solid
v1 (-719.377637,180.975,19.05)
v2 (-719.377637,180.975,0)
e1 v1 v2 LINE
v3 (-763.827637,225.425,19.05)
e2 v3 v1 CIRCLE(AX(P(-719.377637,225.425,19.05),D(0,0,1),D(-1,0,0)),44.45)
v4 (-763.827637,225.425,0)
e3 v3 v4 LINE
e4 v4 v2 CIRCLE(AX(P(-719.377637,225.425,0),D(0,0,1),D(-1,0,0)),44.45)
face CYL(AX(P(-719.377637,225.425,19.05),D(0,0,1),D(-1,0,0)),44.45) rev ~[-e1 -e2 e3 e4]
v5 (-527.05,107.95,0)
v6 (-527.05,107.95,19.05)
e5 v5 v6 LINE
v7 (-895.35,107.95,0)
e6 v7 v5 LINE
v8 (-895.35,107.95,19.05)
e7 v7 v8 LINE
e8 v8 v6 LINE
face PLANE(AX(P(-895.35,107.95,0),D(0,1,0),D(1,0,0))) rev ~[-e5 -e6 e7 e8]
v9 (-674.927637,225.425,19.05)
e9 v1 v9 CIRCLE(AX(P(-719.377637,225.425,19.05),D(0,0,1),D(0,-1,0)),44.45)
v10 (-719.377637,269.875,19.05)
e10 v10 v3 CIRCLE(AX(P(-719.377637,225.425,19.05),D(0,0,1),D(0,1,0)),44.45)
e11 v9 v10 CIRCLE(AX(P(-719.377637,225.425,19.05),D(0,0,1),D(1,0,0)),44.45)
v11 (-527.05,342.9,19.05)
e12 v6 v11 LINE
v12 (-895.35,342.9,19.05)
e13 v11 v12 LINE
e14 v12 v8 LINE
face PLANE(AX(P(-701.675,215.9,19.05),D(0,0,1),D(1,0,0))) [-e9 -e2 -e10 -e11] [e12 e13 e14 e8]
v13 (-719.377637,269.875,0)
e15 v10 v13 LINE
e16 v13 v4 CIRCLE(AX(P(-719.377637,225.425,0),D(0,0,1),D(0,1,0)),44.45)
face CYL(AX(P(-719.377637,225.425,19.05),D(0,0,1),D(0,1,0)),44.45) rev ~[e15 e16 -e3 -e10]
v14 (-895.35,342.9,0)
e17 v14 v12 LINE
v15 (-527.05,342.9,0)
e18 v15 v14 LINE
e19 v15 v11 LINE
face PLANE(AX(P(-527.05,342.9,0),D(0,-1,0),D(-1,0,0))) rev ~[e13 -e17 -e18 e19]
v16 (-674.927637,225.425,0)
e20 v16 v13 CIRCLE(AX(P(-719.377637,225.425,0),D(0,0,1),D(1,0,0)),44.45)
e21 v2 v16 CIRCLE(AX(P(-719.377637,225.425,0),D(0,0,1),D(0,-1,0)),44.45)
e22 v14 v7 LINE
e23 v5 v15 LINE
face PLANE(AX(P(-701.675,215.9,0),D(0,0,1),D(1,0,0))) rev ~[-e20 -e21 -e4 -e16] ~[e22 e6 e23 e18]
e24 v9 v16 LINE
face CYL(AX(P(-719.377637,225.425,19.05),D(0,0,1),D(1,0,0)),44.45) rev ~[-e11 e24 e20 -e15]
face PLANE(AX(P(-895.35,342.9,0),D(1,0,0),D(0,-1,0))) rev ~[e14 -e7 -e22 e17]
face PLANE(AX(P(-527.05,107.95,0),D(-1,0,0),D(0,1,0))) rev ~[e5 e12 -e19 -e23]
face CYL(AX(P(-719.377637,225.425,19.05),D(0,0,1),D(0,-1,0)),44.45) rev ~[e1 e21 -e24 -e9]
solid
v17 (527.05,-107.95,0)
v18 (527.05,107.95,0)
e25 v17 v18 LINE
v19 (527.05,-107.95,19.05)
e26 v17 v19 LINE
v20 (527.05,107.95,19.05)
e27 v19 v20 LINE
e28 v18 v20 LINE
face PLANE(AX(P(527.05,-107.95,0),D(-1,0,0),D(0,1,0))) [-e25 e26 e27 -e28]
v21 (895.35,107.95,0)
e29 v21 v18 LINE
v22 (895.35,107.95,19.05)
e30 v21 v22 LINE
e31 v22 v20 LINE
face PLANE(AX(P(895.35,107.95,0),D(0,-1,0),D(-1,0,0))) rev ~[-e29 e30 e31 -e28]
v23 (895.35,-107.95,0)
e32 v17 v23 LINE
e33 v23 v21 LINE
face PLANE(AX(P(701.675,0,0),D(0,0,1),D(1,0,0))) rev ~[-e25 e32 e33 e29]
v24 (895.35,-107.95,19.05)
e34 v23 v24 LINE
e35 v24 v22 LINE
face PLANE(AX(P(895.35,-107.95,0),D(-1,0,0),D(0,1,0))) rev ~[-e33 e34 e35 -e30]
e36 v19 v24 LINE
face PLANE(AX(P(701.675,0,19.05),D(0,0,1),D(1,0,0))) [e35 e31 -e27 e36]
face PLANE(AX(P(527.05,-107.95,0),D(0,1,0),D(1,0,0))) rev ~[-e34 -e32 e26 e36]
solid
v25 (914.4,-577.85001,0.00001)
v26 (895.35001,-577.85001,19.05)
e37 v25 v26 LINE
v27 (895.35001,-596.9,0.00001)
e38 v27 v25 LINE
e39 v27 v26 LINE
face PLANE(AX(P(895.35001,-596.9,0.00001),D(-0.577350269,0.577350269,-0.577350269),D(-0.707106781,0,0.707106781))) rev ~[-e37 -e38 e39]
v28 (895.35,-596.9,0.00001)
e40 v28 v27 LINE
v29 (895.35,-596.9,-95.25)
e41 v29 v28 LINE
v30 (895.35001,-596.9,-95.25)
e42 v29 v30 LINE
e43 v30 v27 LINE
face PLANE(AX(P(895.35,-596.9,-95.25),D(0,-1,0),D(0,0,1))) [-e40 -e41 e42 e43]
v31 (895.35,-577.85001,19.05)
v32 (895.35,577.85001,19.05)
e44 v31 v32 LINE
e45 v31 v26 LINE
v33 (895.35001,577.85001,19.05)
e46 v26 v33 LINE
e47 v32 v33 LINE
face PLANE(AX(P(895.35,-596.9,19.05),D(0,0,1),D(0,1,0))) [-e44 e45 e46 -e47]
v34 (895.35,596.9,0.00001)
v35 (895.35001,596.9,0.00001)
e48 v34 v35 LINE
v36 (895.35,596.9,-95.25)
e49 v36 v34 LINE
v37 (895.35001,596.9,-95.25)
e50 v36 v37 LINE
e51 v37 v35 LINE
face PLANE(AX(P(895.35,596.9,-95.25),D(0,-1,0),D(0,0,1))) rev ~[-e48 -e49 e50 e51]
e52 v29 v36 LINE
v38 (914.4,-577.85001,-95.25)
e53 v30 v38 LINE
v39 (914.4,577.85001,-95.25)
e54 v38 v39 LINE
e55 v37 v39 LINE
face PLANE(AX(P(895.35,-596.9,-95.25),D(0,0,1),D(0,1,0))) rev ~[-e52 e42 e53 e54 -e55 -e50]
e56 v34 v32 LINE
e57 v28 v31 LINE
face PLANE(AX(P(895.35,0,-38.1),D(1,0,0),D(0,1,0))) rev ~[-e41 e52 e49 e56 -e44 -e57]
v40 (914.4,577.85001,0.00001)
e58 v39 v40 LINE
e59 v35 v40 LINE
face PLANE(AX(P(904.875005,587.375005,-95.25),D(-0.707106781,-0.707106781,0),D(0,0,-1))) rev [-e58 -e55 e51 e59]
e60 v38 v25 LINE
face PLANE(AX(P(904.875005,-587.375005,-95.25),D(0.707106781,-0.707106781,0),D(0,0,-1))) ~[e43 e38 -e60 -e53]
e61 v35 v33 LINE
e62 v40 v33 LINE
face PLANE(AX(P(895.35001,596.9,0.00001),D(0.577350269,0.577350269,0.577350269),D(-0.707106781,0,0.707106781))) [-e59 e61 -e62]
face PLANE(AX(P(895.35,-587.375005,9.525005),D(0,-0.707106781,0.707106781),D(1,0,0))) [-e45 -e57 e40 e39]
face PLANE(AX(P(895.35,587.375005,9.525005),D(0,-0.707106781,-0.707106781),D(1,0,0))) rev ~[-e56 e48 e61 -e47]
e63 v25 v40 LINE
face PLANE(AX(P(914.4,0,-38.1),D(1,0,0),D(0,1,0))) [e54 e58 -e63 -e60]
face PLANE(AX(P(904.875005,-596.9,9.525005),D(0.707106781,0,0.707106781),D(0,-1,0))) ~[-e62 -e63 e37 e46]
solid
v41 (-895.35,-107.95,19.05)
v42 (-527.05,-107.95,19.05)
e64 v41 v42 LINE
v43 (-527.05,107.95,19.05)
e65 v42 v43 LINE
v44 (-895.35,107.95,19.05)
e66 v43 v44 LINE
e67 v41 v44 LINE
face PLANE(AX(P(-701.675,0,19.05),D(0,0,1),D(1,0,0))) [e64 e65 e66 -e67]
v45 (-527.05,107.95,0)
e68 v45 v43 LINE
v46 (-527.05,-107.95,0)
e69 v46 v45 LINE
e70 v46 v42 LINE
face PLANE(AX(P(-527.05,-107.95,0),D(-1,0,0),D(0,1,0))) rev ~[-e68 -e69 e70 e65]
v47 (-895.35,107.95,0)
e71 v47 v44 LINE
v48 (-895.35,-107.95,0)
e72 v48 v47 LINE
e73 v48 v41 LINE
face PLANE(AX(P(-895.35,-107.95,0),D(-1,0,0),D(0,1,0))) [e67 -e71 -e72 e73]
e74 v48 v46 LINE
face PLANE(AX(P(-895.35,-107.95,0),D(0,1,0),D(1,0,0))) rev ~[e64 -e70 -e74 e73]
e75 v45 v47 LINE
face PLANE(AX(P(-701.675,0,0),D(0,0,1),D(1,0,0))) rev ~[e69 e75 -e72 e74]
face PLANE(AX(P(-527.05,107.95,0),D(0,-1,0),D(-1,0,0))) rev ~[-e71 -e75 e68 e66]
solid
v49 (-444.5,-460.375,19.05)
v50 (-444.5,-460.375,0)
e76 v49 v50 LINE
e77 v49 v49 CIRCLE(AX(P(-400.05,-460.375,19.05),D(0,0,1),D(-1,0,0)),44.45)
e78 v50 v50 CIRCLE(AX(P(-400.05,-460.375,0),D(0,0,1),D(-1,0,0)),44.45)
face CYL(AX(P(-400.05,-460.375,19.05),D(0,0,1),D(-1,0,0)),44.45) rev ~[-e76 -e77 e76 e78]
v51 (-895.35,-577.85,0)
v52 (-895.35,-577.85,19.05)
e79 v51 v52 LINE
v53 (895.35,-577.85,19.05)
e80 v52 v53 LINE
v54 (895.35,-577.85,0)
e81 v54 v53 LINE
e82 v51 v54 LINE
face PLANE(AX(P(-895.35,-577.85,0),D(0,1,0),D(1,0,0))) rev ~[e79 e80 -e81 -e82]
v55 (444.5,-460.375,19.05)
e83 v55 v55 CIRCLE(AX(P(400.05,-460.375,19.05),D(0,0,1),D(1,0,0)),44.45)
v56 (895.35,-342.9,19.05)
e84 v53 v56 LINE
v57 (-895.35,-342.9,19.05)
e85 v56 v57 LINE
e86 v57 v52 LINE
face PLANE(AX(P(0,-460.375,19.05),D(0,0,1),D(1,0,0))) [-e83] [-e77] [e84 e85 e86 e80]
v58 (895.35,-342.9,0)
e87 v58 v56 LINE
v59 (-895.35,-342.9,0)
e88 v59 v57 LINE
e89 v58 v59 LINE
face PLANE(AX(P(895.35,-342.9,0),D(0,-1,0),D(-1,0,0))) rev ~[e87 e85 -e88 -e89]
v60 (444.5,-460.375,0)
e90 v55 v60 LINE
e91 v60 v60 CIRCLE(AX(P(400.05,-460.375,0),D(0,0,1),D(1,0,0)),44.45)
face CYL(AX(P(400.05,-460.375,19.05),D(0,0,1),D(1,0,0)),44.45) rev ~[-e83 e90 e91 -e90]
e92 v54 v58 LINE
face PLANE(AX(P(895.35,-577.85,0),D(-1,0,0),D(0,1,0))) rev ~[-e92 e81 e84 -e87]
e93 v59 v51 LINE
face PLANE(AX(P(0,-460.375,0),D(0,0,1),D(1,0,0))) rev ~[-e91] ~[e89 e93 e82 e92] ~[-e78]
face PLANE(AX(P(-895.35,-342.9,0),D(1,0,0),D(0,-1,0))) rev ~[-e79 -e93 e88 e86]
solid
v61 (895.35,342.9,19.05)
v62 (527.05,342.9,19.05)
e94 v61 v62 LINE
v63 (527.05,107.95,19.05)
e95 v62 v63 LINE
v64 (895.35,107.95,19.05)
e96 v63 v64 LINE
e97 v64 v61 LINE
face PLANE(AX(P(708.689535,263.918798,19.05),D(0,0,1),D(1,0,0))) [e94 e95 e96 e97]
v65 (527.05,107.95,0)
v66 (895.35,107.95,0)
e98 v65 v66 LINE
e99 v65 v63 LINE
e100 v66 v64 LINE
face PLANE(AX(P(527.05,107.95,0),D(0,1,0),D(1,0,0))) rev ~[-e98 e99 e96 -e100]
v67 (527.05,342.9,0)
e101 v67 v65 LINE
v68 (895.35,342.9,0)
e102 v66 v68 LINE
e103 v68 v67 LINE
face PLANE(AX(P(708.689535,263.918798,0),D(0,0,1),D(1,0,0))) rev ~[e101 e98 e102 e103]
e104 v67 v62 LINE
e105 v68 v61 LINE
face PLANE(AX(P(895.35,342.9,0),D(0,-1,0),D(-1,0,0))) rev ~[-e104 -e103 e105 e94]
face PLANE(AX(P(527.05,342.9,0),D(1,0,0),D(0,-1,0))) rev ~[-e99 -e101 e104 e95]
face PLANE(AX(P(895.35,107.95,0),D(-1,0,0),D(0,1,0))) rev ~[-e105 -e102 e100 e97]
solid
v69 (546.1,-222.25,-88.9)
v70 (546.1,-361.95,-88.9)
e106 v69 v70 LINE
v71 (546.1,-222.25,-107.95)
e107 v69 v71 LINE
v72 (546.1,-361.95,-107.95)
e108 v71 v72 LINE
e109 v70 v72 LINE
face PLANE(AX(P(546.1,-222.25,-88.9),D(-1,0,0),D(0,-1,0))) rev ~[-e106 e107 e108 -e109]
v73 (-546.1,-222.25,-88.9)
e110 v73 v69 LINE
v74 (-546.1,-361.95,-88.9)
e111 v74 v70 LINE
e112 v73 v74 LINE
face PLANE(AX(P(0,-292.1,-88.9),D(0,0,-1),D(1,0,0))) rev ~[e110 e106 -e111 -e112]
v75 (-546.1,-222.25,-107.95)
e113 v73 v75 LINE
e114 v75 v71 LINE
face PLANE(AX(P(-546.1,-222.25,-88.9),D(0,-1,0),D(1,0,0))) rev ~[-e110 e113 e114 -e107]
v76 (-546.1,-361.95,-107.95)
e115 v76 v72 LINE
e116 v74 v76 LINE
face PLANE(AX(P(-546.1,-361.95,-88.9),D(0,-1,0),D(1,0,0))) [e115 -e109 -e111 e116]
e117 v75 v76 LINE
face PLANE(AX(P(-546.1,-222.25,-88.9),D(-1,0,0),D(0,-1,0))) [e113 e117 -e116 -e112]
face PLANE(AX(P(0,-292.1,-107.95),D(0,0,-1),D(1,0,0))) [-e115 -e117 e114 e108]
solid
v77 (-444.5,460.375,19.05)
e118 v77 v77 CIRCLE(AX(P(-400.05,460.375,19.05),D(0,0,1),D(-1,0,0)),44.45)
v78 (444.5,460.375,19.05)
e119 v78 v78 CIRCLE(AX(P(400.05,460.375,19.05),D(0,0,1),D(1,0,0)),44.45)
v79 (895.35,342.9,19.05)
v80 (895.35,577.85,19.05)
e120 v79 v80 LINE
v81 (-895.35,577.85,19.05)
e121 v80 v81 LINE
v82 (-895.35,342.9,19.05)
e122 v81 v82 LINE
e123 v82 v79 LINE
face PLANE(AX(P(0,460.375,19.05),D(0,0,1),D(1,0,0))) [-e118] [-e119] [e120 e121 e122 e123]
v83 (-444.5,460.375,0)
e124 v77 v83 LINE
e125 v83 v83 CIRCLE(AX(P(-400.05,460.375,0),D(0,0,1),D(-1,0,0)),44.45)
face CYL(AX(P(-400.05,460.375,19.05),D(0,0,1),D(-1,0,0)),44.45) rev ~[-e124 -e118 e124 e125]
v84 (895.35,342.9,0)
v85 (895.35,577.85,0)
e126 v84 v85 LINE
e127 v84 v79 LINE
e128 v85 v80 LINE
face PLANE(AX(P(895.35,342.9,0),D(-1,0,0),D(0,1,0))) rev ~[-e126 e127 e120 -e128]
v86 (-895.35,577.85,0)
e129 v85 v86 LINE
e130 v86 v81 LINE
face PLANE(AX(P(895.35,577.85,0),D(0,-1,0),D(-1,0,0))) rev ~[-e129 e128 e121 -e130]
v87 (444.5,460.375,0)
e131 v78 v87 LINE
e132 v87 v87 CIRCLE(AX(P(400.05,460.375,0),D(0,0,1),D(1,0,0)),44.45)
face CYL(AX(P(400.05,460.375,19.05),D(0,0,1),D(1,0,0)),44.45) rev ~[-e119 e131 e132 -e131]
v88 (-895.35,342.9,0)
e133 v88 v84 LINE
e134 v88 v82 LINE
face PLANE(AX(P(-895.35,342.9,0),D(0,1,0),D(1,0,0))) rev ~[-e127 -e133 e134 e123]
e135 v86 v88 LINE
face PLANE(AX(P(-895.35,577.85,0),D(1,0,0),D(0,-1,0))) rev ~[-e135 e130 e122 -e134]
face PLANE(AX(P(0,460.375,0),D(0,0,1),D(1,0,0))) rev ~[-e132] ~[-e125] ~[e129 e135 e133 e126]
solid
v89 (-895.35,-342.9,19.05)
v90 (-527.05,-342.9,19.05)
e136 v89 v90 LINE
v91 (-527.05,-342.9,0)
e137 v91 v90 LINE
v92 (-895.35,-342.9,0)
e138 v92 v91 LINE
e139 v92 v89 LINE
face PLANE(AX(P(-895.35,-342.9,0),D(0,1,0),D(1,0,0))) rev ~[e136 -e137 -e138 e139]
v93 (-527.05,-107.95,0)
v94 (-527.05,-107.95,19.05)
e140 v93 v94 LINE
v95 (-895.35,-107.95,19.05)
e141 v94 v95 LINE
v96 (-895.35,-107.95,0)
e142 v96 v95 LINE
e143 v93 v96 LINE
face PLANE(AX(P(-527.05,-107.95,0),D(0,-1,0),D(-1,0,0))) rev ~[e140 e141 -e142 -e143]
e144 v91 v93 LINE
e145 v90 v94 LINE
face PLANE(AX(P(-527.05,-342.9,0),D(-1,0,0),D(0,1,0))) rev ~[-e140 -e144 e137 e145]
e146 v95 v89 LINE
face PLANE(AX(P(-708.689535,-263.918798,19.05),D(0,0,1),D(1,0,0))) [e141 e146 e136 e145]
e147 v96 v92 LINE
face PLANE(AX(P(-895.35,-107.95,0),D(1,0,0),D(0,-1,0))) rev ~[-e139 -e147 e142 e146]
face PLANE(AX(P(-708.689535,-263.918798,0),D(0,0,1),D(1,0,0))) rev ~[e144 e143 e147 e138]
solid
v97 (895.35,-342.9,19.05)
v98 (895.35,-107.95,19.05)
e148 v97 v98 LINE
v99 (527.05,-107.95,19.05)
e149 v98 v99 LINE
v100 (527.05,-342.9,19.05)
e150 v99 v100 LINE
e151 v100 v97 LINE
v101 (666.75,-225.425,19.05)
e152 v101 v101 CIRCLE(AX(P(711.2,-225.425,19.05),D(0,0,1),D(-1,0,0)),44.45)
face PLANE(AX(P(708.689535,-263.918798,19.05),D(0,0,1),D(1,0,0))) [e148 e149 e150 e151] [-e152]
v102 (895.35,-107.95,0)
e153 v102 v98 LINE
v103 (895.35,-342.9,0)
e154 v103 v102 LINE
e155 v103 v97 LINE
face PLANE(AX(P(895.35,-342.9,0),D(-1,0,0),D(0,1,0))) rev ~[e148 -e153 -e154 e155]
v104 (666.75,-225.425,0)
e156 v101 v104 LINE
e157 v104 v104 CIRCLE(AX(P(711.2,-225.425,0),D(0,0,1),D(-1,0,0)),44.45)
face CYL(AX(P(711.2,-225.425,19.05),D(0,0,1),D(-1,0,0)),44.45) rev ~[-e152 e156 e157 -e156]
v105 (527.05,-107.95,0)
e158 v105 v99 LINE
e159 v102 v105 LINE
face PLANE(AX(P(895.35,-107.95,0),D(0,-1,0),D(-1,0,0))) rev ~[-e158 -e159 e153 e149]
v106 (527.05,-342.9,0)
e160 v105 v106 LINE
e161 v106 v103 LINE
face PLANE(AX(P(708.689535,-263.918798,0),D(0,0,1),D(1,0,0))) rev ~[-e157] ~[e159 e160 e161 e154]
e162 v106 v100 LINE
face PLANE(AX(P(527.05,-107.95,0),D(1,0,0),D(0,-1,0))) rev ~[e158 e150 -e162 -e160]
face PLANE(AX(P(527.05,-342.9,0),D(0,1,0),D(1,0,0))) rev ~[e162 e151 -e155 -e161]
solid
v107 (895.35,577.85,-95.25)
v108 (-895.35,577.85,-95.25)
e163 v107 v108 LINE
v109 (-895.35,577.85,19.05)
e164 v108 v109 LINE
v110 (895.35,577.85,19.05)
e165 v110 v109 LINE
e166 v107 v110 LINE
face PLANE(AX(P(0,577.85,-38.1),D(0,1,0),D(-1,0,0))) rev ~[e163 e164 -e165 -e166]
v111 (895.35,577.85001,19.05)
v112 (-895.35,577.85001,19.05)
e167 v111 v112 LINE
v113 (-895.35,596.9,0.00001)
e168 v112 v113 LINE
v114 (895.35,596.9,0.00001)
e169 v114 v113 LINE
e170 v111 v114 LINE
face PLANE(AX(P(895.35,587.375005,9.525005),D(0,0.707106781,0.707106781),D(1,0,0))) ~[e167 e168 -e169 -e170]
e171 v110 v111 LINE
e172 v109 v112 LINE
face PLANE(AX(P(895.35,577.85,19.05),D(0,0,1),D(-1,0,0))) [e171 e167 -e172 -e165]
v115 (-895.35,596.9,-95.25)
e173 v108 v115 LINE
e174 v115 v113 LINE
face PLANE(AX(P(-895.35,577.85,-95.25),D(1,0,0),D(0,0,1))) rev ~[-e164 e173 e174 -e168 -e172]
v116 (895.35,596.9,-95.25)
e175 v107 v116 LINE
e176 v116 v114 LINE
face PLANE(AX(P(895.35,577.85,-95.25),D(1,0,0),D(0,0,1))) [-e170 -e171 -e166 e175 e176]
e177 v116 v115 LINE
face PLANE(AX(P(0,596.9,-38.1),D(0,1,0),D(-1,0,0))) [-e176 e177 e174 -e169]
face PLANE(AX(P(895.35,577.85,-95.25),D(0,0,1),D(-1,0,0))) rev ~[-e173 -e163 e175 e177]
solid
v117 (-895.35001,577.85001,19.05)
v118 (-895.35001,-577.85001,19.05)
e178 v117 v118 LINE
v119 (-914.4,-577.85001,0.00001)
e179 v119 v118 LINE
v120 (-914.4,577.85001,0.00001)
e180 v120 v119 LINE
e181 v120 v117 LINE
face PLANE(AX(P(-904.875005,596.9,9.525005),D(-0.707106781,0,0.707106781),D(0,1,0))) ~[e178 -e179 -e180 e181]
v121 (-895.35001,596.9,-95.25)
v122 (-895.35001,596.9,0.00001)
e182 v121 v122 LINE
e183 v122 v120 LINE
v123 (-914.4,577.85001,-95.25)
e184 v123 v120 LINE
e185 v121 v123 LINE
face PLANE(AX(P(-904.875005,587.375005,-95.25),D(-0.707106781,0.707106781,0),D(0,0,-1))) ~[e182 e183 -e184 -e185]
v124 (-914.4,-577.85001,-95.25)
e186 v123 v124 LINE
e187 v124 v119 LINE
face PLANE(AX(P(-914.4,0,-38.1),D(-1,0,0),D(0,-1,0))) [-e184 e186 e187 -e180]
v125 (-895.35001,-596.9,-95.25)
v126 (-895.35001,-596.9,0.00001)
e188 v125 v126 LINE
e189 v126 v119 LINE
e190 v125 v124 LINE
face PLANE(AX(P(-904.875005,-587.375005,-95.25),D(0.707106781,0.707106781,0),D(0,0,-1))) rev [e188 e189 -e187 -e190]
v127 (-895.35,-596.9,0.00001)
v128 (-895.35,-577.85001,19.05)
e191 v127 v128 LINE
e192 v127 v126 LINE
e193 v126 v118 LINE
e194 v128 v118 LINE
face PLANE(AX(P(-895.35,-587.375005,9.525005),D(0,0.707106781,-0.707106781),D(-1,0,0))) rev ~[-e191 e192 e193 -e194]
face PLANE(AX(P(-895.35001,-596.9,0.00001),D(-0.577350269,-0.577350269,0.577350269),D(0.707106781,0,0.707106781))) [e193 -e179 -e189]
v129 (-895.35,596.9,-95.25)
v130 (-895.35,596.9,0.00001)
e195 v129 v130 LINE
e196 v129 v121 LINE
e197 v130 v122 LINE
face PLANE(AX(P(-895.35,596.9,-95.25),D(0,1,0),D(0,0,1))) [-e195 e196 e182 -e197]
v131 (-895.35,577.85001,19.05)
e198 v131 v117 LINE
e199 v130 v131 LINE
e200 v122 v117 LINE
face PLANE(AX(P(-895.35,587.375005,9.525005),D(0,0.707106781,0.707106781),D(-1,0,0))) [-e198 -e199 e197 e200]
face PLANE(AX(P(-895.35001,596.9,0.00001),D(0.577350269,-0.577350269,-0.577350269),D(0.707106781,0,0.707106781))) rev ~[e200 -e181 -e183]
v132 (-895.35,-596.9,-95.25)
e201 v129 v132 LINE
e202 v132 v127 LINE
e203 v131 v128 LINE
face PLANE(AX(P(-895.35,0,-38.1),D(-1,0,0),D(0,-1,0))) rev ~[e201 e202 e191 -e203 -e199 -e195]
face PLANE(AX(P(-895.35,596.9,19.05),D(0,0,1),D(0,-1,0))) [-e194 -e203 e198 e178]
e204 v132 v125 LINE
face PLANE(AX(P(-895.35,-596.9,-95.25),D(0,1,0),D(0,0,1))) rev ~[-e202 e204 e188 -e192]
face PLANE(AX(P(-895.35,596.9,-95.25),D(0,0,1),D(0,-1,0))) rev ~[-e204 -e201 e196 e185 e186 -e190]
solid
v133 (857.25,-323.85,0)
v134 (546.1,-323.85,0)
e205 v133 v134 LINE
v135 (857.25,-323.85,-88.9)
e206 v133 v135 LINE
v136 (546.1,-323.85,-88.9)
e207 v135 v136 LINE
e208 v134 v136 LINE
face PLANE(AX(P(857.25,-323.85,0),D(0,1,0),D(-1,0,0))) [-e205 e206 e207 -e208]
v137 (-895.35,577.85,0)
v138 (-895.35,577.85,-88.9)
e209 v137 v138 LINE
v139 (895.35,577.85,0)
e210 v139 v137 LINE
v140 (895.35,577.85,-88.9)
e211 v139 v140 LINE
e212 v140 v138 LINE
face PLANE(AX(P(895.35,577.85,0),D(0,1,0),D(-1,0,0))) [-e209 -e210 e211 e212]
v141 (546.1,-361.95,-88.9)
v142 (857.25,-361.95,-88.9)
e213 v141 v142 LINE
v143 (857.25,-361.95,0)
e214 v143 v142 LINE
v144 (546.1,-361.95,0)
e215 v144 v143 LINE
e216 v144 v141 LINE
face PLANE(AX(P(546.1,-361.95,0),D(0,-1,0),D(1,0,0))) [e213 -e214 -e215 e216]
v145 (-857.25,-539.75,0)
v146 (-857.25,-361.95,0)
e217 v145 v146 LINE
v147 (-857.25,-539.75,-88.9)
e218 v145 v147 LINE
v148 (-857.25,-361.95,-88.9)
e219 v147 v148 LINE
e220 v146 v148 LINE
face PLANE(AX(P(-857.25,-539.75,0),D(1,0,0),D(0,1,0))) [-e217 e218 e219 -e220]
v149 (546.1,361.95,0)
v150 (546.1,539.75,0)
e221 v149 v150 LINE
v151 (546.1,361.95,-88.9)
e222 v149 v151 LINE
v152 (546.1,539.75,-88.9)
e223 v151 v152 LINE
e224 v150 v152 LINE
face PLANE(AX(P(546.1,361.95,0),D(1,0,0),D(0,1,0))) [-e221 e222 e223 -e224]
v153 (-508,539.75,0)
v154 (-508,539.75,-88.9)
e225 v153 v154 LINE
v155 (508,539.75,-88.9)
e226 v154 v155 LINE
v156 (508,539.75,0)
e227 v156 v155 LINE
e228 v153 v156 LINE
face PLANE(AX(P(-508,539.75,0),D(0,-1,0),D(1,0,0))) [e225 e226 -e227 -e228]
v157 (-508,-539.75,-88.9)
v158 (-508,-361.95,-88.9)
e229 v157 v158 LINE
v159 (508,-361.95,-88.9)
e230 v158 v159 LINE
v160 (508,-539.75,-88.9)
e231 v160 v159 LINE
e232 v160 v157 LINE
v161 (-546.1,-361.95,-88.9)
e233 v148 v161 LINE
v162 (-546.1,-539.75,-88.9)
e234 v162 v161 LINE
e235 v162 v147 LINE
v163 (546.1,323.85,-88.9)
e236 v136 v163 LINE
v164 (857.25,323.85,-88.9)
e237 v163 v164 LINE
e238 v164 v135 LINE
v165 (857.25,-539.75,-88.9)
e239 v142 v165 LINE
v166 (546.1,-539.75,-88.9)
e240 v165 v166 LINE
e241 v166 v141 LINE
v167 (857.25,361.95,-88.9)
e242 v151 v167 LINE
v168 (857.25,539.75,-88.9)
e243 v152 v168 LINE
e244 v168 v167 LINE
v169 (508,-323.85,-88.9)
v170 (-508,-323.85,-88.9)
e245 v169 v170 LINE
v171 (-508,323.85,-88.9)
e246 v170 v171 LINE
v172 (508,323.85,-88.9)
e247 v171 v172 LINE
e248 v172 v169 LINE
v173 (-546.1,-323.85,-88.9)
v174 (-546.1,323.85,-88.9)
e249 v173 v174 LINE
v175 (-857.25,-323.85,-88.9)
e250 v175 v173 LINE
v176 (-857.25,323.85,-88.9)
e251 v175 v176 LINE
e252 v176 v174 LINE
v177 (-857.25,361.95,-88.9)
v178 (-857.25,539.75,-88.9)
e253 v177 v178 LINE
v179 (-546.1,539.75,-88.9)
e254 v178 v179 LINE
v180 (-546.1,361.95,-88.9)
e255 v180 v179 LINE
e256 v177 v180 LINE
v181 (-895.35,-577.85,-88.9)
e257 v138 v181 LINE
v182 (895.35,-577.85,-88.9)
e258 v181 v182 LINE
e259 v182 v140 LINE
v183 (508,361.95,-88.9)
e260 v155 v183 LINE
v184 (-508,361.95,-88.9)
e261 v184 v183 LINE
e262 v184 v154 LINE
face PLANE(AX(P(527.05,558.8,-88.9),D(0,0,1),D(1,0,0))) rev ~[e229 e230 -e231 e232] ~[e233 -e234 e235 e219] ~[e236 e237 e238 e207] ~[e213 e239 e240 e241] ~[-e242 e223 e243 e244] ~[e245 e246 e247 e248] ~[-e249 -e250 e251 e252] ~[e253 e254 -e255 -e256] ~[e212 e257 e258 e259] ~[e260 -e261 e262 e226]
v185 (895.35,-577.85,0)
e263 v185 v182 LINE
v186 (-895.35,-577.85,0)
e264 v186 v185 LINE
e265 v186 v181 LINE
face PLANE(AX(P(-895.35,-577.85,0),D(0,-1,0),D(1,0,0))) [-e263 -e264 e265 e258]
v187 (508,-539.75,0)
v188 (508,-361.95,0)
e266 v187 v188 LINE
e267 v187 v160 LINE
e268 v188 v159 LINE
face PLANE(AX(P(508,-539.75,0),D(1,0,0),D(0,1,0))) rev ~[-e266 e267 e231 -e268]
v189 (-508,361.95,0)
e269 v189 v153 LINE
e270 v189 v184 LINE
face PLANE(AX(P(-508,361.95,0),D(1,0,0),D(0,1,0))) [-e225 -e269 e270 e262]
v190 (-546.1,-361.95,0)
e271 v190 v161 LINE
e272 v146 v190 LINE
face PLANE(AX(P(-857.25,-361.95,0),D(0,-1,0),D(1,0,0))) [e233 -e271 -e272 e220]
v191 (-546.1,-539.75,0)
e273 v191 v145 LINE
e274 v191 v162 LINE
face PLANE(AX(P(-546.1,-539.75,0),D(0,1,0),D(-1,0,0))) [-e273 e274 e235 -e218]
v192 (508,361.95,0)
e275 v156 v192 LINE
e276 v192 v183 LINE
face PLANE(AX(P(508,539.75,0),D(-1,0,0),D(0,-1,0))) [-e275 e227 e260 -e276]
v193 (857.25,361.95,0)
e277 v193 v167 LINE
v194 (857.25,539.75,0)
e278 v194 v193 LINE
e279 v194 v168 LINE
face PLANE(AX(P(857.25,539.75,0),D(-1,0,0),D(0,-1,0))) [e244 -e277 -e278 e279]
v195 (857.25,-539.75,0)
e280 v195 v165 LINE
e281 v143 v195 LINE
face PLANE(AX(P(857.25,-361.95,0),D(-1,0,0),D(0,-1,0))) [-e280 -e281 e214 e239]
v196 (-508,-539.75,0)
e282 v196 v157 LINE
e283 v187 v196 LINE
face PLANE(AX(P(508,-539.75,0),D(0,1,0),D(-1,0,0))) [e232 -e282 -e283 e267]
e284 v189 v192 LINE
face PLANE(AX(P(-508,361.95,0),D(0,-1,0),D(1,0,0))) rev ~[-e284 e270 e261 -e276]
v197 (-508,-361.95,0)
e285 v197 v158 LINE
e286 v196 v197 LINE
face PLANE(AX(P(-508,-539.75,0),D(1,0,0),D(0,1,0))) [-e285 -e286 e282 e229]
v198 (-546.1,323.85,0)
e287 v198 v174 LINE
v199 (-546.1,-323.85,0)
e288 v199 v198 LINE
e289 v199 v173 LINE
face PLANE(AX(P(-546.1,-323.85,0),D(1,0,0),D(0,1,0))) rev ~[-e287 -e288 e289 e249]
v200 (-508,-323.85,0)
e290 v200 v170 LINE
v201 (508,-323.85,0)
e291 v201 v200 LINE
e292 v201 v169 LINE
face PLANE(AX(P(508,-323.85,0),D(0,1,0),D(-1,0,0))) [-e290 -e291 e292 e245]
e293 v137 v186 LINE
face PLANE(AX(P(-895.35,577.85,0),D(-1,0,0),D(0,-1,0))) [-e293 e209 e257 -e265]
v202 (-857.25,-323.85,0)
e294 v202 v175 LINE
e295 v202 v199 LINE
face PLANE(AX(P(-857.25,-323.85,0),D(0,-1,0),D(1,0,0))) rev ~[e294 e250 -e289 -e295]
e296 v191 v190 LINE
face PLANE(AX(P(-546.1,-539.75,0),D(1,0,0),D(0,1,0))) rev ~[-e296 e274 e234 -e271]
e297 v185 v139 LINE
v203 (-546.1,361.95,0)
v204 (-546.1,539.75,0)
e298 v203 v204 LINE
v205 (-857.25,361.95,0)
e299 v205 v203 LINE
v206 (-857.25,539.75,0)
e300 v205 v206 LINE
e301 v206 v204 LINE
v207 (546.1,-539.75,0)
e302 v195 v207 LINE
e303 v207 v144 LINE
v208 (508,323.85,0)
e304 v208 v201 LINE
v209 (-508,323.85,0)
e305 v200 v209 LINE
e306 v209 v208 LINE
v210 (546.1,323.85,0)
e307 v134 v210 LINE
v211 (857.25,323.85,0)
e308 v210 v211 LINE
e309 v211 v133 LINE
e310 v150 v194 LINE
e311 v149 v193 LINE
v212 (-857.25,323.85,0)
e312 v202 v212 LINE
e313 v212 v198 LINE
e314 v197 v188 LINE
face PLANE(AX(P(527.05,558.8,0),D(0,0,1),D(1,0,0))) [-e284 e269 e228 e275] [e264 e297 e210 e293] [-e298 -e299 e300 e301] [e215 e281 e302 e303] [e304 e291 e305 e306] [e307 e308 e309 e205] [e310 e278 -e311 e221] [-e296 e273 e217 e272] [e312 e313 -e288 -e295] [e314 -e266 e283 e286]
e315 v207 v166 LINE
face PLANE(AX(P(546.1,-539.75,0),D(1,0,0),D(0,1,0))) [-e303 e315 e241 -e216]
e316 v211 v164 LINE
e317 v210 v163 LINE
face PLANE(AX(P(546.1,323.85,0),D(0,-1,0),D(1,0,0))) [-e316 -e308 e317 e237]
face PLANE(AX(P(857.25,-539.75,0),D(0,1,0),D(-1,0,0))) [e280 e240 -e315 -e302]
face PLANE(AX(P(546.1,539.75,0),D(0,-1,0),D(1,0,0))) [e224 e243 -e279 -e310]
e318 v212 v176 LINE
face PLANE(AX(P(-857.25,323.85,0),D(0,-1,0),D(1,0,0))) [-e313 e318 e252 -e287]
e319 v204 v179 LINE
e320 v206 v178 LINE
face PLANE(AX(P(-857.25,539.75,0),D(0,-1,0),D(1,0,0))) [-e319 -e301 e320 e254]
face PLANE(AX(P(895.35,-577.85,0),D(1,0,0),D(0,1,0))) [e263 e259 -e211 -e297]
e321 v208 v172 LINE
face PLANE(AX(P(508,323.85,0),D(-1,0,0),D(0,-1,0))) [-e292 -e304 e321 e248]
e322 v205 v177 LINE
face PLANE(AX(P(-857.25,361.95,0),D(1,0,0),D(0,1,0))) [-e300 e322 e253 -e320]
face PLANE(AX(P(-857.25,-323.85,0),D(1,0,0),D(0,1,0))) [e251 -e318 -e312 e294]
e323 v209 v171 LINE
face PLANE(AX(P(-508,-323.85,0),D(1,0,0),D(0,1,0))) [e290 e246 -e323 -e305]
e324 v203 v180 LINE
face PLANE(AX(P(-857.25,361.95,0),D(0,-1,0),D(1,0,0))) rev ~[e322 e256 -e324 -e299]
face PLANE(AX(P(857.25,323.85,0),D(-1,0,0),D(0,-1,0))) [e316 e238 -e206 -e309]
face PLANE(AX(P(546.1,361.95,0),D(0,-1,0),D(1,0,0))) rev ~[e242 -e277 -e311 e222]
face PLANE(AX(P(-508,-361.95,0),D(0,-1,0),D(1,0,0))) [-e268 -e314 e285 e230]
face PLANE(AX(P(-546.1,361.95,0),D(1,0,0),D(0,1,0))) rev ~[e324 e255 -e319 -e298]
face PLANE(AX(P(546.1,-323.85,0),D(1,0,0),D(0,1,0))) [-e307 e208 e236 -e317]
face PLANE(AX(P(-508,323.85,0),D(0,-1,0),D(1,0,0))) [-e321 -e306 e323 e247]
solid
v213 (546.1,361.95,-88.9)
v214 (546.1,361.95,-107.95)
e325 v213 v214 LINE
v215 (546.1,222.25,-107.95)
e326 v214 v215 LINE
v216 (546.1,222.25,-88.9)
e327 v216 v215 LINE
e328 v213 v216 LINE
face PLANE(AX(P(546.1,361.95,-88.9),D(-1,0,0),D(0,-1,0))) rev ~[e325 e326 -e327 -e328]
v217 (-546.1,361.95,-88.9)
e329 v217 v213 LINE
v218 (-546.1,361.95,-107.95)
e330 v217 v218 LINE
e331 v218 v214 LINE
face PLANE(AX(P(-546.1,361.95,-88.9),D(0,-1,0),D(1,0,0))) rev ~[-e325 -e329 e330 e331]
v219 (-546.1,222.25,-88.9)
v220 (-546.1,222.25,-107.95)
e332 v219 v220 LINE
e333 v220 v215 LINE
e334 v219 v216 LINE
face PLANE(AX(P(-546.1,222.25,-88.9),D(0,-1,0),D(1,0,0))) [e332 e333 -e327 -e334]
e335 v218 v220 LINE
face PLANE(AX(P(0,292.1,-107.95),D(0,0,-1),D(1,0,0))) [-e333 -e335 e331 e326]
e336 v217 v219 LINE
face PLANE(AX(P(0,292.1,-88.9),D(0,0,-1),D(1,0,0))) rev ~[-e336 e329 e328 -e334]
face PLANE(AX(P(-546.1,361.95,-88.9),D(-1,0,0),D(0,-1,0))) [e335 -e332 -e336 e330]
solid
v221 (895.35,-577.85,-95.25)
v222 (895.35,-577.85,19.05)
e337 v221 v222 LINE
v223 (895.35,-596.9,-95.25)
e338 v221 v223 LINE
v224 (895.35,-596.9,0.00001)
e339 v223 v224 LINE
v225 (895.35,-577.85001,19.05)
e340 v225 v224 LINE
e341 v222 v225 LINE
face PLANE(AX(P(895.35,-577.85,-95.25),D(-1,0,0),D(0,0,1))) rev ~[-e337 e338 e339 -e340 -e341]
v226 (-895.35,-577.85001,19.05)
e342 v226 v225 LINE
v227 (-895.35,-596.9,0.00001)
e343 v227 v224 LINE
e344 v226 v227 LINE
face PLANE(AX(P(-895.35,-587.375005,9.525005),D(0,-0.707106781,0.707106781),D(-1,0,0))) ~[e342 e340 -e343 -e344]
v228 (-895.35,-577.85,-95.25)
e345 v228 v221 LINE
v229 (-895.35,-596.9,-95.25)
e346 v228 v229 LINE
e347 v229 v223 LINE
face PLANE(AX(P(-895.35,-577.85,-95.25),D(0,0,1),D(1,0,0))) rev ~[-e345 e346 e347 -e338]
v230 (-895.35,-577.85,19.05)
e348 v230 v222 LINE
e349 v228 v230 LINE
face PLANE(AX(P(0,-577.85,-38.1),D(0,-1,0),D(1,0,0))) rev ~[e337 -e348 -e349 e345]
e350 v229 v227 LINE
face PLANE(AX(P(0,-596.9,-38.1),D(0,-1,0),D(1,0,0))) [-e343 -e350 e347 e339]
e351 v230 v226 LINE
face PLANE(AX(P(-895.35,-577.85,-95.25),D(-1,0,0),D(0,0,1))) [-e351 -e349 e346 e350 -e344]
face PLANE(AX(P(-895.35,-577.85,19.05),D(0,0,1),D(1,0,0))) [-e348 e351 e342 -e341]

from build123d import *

# Parameters (mm, degrees)
F0_W       = 38.1
F0_H       = 38.1
F0_W_2     = 1016
F0_H_2     = 647.7
F0_W_3     = 311.15
F0_H_3     = 177.8
F1_DEPTH   = 88.9
F2_W       = 311.15
F2_H       = 177.8
F2_W_2     = 1016
F3_DEPTH   = 19.05
F2_H_2     = 215.9
F2_W_3     = 38.1
F2_W_4     = 19.05
F4_DEPTH   = 19.05
F5_W       = 1092.2
F5_H       = 139.7
F6_DEPTH   = 19.05
F7_W       = 1790.7
F7_H       = 114.3
F8_DEPTH   = 19.05
F9_W       = 1790.7
F9_H       = 114.3
F10_DEPTH  = 19.05
F11_W      = 1193.8
F11_H      = 114.3
F12_DEPTH  = 19.05
F13_W      = 1193.8
F13_H      = 114.3
F14_DEPTH  = 19.05
F15_SIZE   = 19.04999
F15_2_SIZE = 19.04999
F15_3_SIZE = 19.04999
F15_4_SIZE = 19.04999
F16_R      = 44.45
F17_DEPTH  = 19.05


# Not quite as in the source:
# - a fillet or chamfer is up to 0.001 mm smaller than in the source, because OpenCascade refuses the exact size


with BuildPart() as f1:
    # F0 (on Top) → F1 (new body)
    with BuildSketch(Plane.XY):
        with Locations((527.05, 558.8)):
            Rectangle(F0_W, F0_H)
        with Locations((0, 558.8)):
            Rectangle(F0_W_2, F0_H)
        with Locations((876.3, 0)):
            Rectangle(F0_W, F0_H_2)
        with Locations((876.3, 342.9)):
            Rectangle(F0_W, F0_H)
        with Locations((-876.3, 342.9)):
            Rectangle(F0_W, F0_H)
        with Locations((-876.3, 0)):
            Rectangle(F0_W, F0_H_2)
        with Locations((-527.05, 558.8)):
            Rectangle(F0_W, F0_H)
        with Locations((0, -558.8)):
            Rectangle(F0_W_2, F0_H)
        with Locations((527.05, -558.8)):
            Rectangle(F0_W, F0_H)
        with Locations((876.3, -342.9)):
            Rectangle(F0_W, F0_H)
        Polygon((546.1, 577.85), (546.1, 539.75), (857.25, 539.75), (857.25, 361.95), (895.35, 361.95), (895.35, 577.85), align=None)
        with Locations((-876.3, -342.9)):
            Rectangle(F0_W, F0_H)
        with Locations((-527.05, -558.8)):
            Rectangle(F0_W, F0_H)
        Polygon((-895.35, 361.95), (-857.25, 361.95), (-857.25, 539.75), (-546.1, 539.75), (-546.1, 577.85), (-895.35, 577.85), align=None)
        Polygon((857.25, -539.75), (546.1, -539.75), (546.1, -577.85), (895.35, -577.85), (895.35, -361.95), (857.25, -361.95), align=None)
        Polygon((-857.25, -539.75), (-857.25, -361.95), (-895.35, -361.95), (-895.35, -577.85), (-546.1, -577.85), (-546.1, -539.75), align=None)
        with Locations((-701.675, 342.9)):
            Rectangle(F0_W_3, F0_H)
        with Locations((-527.05, 450.85)):
            Rectangle(F0_W, F0_H_3)
        with Locations((-527.05, 342.9)):
            Rectangle(F0_W, F0_H)
        with Locations((-527.05, 0)):
            Rectangle(F0_W, F0_H_2)
        with Locations((-701.675, -342.9)):
            Rectangle(F0_W_3, F0_H)
        with Locations((-527.05, -450.85)):
            Rectangle(F0_W, F0_H_3)
        with Locations((-527.05, -342.9)):
            Rectangle(F0_W, F0_H)
        with Locations((0, -342.9)):
            Rectangle(F0_W_2, F0_H)
        with Locations((527.05, -450.85)):
            Rectangle(F0_W, F0_H_3)
        with Locations((527.05, -342.9)):
            Rectangle(F0_W, F0_H)
        with Locations((701.675, -342.9)):
            Rectangle(F0_W_3, F0_H)
        with Locations((527.05, 0)):
            Rectangle(F0_W, F0_H_2)
        with Locations((527.05, 342.9)):
            Rectangle(F0_W, F0_H)
        with Locations((527.05, 450.85)):
            Rectangle(F0_W, F0_H_3)
        with Locations((701.675, 342.9)):
            Rectangle(F0_W_3, F0_H)
        with Locations((0, 342.9)):
            Rectangle(F0_W_2, F0_H)
    extrude(amount=-F1_DEPTH)


with BuildPart() as f3:
    # F2 (on face) → F3 (new body)
    with BuildSketch(Plane.XY):
        Polygon((895.35, 577.85), (-895.35, 577.85), (-895.35, 342.9), (-527.05, 342.9), (527.05, 342.9), (895.35, 342.9), align=None)
        with Locations((-701.675, 450.85)):
            Rectangle(F2_W, F2_H, mode=Mode.SUBTRACT)
        with Locations((0, 450.85)):
            Rectangle(F2_W_2, F2_H, mode=Mode.SUBTRACT)
        with Locations((701.675, 450.85)):
            Rectangle(F2_W, F2_H, mode=Mode.SUBTRACT)
        with Locations((-701.675, 450.85)):
            Rectangle(F2_W, F2_H)
        with Locations((0, 450.85)):
            Rectangle(F2_W_2, F2_H)
        with Locations((701.675, 450.85)):
            Rectangle(F2_W, F2_H)
    extrude(amount=F3_DEPTH)


with BuildPart() as f3b:
    # F2 (on face) → F3, piece 2 (new body)
    with BuildSketch(Plane.XY):
        with Locations((701.675, 0)):
            Rectangle(F2_W, F2_H_2)
        with Locations((876.3, 0)):
            Rectangle(F2_W_3, F2_H_2)
        with Locations((536.575, 0)):
            Rectangle(F2_W_4, F2_H_2)
    extrude(amount=F3_DEPTH)


with BuildPart() as f3c:
    # F2 (on face) → F3, piece 3 (new body)
    with BuildSketch(Plane.XY):
        with Locations((-701.675, 0)):
            Rectangle(F2_W, F2_H_2)
        with Locations((-876.3, 0)):
            Rectangle(F2_W_3, F2_H_2)
        with Locations((-536.575, 0)):
            Rectangle(F2_W_4, F2_H_2)
    extrude(amount=F3_DEPTH)


with BuildPart() as f3d:
    # F2 (on face) → F3, piece 4 (new body)
    with BuildSketch(Plane.XY):
        Polygon((-527.05, -342.9), (-895.35, -342.9), (-895.35, -577.85), (895.35, -577.85), (895.35, -342.9), (527.05, -342.9), align=None)
        with Locations((-701.675, -450.85)):
            Rectangle(F2_W, F2_H, mode=Mode.SUBTRACT)
        with Locations((0, -450.85)):
            Rectangle(F2_W_2, F2_H, mode=Mode.SUBTRACT)
        with Locations((701.675, -450.85)):
            Rectangle(F2_W, F2_H, mode=Mode.SUBTRACT)
        with Locations((-701.675, -450.85)):
            Rectangle(F2_W, F2_H)
        with Locations((0, -450.85)):
            Rectangle(F2_W_2, F2_H)
        with Locations((701.675, -450.85)):
            Rectangle(F2_W, F2_H)
    extrude(amount=F3_DEPTH)


with BuildPart() as f4:
    # F2 (on face) → F4 (new body)
    with BuildSketch(Plane.XY):
        with Locations((-701.675, 215.9)):
            Rectangle(F2_W, F2_H_2)
        Polygon((-527.05, 342.9), (-895.35, 342.9), (-895.35, 107.95), (-857.25, 107.95), (-857.25, 323.85), (-546.1, 323.85), (-546.1, 107.95), (-527.05, 107.95), align=None)
    extrude(amount=F4_DEPTH)


with BuildPart() as f4b:
    # F2 (on face) → F4, piece 2 (new body)
    with BuildSketch(Plane.XY):
        Polygon((895.35, 107.95), (895.35, 342.9), (527.05, 342.9), (527.05, 107.95), (546.1, 107.95), (546.1, 323.85), (857.25, 323.85), (857.25, 107.95), align=None)
        with Locations((701.675, 215.9)):
            Rectangle(F2_W, F2_H_2)
    extrude(amount=F4_DEPTH)


with BuildPart() as f4c:
    # F2 (on face) → F4, piece 3 (new body)
    with BuildSketch(Plane.XY):
        Polygon((895.35, -342.9), (895.35, -107.95), (857.25, -107.95), (857.25, -323.85), (546.1, -323.85), (546.1, -107.95), (527.05, -107.95), (527.05, -342.9), align=None)
        with Locations((701.675, -215.9)):
            Rectangle(F2_W, F2_H_2)
    extrude(amount=F4_DEPTH)


with BuildPart() as f4d:
    # F2 (on face) → F4, piece 4 (new body)
    with BuildSketch(Plane.XY):
        Polygon((-857.25, -107.95), (-895.35, -107.95), (-895.35, -342.9), (-527.05, -342.9), (-527.05, -107.95), (-546.1, -107.95), (-546.1, -323.85), (-857.25, -323.85), align=None)
        with Locations((-701.675, -215.9)):
            Rectangle(F2_W, F2_H_2)
    extrude(amount=F4_DEPTH)


with BuildPart() as f6:
    # F5 (on face) → F6 (new body)
    with BuildSketch(Plane(origin=(0, 0, -88.9), x_dir=(1, 0, 0), z_dir=(0, 0, -1))):
        with Locations((0, 292.1)):
            Rectangle(F5_W, F5_H)
    extrude(amount=F6_DEPTH)


with BuildPart() as f6b:
    # F5 (on face) → F6, piece 2 (new body)
    with BuildSketch(Plane(origin=(0, 0, -88.9), x_dir=(1, 0, 0), z_dir=(0, 0, -1))):
        with Locations((0, -292.1)):
            Rectangle(F5_W, F5_H)
    extrude(amount=F6_DEPTH)


with BuildPart() as f8:
    # F7 (on face) → F8 (new body)
    with BuildSketch(Plane.XZ.offset(577.85)):
        with Locations((0, -38.1)):
            Rectangle(F7_W, F7_H)
    extrude(amount=F8_DEPTH)

    # F15#3 (size 19.05 in the source; OpenCascade refuses exactly that, so slightly less here)
    f15_3_edges = [f8.edges().sort_by_distance(p)[0] for p in [
        (0, -596.9, 19.05),
    ]]
    chamfer(f15_3_edges, length=F15_3_SIZE)


with BuildPart() as f10:
    # F9 (on face) → F10 (new body)
    with BuildSketch(Plane(origin=(0, 577.85, 0), x_dir=(-1, 0, 0), z_dir=(0, 1, 0))):
        with Locations((0, -38.1)):
            Rectangle(F9_W, F9_H)
    extrude(amount=F10_DEPTH)

    # F15#2 (size 19.05 in the source; OpenCascade refuses exactly that, so slightly less here)
    f15_2_edges = [f10.edges().sort_by_distance(p)[0] for p in [
        (0, 596.9, 19.05),
    ]]
    chamfer(f15_2_edges, length=F15_2_SIZE)


with BuildPart() as f12:
    # F11 (on face) → F12 (new body)
    with BuildSketch(Plane.YZ.offset(895.35)):
        with Locations((0, -38.1)):
            Rectangle(F11_W, F11_H)
    extrude(amount=F12_DEPTH)

    # F15#4 (size 19.05 in the source; OpenCascade refuses exactly that, so slightly less here)
    f15_4_edges = [f12.edges().sort_by_distance(p)[0] for p in [
        (914.4, 0, 19.05),
        (914.4, -596.9, -38.1),
        (914.4, 596.9, -38.1),
        (904.875, 596.9, 19.05),
        (904.875, -596.9, 19.05),
    ]]
    chamfer(f15_4_edges, length=F15_4_SIZE)


with BuildPart() as f14:
    # F13 (on face) → F14 (new body)
    with BuildSketch(Plane(origin=(-895.35, 0, 0), x_dir=(0, -1, 0), z_dir=(-1, 0, 0))):
        with Locations((0, -38.1)):
            Rectangle(F13_W, F13_H)
    extrude(amount=F14_DEPTH)

    # F15 (size 19.05 in the source; OpenCascade refuses exactly that, so slightly less here)
    f15_edges = [f14.edges().sort_by_distance(p)[0] for p in [
        (-914.4, 0, 19.05),
        (-914.4, 596.9, -38.1),
        (-914.4, -596.9, -38.1),
        (-904.875, -596.9, 19.05),
        (-904.875, 596.9, 19.05),
    ]]
    chamfer(f15_edges, length=F15_SIZE)


with BuildPart() as f17_tool:
    # F16 (on face) → F17 (new body)
    with BuildSketch(Plane.XY.offset(19.05)):
        with BuildLine():
            ThreePointArc((-355.6, 460.375), (-400.05, 504.825), (-444.5, 460.375))
            ThreePointArc((-444.5, 460.375), (-400.05, 415.925), (-355.6, 460.375))
        make_face()
        with Locations((400.05, 460.375)):
            Circle(F16_R)
        with BuildLine():
            ThreePointArc((755.65, -225.425), (711.2, -180.975), (666.75, -225.425))
            Line((666.75, -225.425), (755.65, -225.425))
        make_face()
        with BuildLine():
            Line((755.65, -225.425), (666.75, -225.425))
            ThreePointArc((666.75, -225.425), (711.2, -269.875), (755.65, -225.425))
        make_face()
        with Locations((400.05, -460.375)):
            Circle(F16_R)
        with BuildLine():
            ThreePointArc((-355.6, -460.375), (-400.05, -415.925), (-444.5, -460.375))
            ThreePointArc((-444.5, -460.375), (-400.05, -504.825), (-355.6, -460.375))
        make_face()
        with BuildLine():
            ThreePointArc((-719.3776369095, 180.975), (-687.9467404857, 193.9941035763), (-674.9276369095, 225.425))
            Line((-674.9276369095, 225.425), (-719.3776369095, 225.425))
            Line((-719.3776369095, 225.425), (-719.3776369095, 180.975))
        make_face()
        with BuildLine():
            Line((-719.3776369095, 225.425), (-674.9276369095, 225.425))
            ThreePointArc((-674.9276369095, 225.425), (-687.9467404857, 256.8558964237), (-719.3776369095, 269.875))
            Line((-719.3776369095, 269.875), (-719.3776369095, 225.425))
        make_face()
        with BuildLine():
            Line((-719.3776369095, 180.975), (-719.3776369095, 225.425))
            Line((-719.3776369095, 225.425), (-763.8276369095, 225.425))
            ThreePointArc((-763.8276369095, 225.425), (-750.8085333332, 193.9941035763), (-719.3776369095, 180.975))
        make_face()
        with BuildLine():
            Line((-763.8276369095, 225.425), (-719.3776369095, 225.425))
            Line((-719.3776369095, 225.425), (-719.3776369095, 269.875))
            ThreePointArc((-719.3776369095, 269.875), (-750.8085333332, 256.8558964237), (-763.8276369095, 225.425))
        make_face()
    extrude(amount=-F17_DEPTH)


with BuildPart() as f3_1:
    add(f3.part)

    # F17: cut by f17_tool
    add(f17_tool.part, mode=Mode.SUBTRACT)


with BuildPart() as f3d_1:
    add(f3d.part)

    # F17: cut by f17_tool
    add(f17_tool.part, mode=Mode.SUBTRACT)


with BuildPart() as f4_1:
    add(f4.part)

    # F17: cut by f17_tool
    add(f17_tool.part, mode=Mode.SUBTRACT)


with BuildPart() as f4c_1:
    add(f4c.part)

    # F17: cut by f17_tool
    add(f17_tool.part, mode=Mode.SUBTRACT)


solid = Compound([f1.part, f3b.part, f3c.part, f4b.part, f4d.part, f6.part, f6b.part, f8.part, f10.part, f12.part, f14.part, f3_1.part, f3d_1.part, f4_1.part, f4c_1.part])
